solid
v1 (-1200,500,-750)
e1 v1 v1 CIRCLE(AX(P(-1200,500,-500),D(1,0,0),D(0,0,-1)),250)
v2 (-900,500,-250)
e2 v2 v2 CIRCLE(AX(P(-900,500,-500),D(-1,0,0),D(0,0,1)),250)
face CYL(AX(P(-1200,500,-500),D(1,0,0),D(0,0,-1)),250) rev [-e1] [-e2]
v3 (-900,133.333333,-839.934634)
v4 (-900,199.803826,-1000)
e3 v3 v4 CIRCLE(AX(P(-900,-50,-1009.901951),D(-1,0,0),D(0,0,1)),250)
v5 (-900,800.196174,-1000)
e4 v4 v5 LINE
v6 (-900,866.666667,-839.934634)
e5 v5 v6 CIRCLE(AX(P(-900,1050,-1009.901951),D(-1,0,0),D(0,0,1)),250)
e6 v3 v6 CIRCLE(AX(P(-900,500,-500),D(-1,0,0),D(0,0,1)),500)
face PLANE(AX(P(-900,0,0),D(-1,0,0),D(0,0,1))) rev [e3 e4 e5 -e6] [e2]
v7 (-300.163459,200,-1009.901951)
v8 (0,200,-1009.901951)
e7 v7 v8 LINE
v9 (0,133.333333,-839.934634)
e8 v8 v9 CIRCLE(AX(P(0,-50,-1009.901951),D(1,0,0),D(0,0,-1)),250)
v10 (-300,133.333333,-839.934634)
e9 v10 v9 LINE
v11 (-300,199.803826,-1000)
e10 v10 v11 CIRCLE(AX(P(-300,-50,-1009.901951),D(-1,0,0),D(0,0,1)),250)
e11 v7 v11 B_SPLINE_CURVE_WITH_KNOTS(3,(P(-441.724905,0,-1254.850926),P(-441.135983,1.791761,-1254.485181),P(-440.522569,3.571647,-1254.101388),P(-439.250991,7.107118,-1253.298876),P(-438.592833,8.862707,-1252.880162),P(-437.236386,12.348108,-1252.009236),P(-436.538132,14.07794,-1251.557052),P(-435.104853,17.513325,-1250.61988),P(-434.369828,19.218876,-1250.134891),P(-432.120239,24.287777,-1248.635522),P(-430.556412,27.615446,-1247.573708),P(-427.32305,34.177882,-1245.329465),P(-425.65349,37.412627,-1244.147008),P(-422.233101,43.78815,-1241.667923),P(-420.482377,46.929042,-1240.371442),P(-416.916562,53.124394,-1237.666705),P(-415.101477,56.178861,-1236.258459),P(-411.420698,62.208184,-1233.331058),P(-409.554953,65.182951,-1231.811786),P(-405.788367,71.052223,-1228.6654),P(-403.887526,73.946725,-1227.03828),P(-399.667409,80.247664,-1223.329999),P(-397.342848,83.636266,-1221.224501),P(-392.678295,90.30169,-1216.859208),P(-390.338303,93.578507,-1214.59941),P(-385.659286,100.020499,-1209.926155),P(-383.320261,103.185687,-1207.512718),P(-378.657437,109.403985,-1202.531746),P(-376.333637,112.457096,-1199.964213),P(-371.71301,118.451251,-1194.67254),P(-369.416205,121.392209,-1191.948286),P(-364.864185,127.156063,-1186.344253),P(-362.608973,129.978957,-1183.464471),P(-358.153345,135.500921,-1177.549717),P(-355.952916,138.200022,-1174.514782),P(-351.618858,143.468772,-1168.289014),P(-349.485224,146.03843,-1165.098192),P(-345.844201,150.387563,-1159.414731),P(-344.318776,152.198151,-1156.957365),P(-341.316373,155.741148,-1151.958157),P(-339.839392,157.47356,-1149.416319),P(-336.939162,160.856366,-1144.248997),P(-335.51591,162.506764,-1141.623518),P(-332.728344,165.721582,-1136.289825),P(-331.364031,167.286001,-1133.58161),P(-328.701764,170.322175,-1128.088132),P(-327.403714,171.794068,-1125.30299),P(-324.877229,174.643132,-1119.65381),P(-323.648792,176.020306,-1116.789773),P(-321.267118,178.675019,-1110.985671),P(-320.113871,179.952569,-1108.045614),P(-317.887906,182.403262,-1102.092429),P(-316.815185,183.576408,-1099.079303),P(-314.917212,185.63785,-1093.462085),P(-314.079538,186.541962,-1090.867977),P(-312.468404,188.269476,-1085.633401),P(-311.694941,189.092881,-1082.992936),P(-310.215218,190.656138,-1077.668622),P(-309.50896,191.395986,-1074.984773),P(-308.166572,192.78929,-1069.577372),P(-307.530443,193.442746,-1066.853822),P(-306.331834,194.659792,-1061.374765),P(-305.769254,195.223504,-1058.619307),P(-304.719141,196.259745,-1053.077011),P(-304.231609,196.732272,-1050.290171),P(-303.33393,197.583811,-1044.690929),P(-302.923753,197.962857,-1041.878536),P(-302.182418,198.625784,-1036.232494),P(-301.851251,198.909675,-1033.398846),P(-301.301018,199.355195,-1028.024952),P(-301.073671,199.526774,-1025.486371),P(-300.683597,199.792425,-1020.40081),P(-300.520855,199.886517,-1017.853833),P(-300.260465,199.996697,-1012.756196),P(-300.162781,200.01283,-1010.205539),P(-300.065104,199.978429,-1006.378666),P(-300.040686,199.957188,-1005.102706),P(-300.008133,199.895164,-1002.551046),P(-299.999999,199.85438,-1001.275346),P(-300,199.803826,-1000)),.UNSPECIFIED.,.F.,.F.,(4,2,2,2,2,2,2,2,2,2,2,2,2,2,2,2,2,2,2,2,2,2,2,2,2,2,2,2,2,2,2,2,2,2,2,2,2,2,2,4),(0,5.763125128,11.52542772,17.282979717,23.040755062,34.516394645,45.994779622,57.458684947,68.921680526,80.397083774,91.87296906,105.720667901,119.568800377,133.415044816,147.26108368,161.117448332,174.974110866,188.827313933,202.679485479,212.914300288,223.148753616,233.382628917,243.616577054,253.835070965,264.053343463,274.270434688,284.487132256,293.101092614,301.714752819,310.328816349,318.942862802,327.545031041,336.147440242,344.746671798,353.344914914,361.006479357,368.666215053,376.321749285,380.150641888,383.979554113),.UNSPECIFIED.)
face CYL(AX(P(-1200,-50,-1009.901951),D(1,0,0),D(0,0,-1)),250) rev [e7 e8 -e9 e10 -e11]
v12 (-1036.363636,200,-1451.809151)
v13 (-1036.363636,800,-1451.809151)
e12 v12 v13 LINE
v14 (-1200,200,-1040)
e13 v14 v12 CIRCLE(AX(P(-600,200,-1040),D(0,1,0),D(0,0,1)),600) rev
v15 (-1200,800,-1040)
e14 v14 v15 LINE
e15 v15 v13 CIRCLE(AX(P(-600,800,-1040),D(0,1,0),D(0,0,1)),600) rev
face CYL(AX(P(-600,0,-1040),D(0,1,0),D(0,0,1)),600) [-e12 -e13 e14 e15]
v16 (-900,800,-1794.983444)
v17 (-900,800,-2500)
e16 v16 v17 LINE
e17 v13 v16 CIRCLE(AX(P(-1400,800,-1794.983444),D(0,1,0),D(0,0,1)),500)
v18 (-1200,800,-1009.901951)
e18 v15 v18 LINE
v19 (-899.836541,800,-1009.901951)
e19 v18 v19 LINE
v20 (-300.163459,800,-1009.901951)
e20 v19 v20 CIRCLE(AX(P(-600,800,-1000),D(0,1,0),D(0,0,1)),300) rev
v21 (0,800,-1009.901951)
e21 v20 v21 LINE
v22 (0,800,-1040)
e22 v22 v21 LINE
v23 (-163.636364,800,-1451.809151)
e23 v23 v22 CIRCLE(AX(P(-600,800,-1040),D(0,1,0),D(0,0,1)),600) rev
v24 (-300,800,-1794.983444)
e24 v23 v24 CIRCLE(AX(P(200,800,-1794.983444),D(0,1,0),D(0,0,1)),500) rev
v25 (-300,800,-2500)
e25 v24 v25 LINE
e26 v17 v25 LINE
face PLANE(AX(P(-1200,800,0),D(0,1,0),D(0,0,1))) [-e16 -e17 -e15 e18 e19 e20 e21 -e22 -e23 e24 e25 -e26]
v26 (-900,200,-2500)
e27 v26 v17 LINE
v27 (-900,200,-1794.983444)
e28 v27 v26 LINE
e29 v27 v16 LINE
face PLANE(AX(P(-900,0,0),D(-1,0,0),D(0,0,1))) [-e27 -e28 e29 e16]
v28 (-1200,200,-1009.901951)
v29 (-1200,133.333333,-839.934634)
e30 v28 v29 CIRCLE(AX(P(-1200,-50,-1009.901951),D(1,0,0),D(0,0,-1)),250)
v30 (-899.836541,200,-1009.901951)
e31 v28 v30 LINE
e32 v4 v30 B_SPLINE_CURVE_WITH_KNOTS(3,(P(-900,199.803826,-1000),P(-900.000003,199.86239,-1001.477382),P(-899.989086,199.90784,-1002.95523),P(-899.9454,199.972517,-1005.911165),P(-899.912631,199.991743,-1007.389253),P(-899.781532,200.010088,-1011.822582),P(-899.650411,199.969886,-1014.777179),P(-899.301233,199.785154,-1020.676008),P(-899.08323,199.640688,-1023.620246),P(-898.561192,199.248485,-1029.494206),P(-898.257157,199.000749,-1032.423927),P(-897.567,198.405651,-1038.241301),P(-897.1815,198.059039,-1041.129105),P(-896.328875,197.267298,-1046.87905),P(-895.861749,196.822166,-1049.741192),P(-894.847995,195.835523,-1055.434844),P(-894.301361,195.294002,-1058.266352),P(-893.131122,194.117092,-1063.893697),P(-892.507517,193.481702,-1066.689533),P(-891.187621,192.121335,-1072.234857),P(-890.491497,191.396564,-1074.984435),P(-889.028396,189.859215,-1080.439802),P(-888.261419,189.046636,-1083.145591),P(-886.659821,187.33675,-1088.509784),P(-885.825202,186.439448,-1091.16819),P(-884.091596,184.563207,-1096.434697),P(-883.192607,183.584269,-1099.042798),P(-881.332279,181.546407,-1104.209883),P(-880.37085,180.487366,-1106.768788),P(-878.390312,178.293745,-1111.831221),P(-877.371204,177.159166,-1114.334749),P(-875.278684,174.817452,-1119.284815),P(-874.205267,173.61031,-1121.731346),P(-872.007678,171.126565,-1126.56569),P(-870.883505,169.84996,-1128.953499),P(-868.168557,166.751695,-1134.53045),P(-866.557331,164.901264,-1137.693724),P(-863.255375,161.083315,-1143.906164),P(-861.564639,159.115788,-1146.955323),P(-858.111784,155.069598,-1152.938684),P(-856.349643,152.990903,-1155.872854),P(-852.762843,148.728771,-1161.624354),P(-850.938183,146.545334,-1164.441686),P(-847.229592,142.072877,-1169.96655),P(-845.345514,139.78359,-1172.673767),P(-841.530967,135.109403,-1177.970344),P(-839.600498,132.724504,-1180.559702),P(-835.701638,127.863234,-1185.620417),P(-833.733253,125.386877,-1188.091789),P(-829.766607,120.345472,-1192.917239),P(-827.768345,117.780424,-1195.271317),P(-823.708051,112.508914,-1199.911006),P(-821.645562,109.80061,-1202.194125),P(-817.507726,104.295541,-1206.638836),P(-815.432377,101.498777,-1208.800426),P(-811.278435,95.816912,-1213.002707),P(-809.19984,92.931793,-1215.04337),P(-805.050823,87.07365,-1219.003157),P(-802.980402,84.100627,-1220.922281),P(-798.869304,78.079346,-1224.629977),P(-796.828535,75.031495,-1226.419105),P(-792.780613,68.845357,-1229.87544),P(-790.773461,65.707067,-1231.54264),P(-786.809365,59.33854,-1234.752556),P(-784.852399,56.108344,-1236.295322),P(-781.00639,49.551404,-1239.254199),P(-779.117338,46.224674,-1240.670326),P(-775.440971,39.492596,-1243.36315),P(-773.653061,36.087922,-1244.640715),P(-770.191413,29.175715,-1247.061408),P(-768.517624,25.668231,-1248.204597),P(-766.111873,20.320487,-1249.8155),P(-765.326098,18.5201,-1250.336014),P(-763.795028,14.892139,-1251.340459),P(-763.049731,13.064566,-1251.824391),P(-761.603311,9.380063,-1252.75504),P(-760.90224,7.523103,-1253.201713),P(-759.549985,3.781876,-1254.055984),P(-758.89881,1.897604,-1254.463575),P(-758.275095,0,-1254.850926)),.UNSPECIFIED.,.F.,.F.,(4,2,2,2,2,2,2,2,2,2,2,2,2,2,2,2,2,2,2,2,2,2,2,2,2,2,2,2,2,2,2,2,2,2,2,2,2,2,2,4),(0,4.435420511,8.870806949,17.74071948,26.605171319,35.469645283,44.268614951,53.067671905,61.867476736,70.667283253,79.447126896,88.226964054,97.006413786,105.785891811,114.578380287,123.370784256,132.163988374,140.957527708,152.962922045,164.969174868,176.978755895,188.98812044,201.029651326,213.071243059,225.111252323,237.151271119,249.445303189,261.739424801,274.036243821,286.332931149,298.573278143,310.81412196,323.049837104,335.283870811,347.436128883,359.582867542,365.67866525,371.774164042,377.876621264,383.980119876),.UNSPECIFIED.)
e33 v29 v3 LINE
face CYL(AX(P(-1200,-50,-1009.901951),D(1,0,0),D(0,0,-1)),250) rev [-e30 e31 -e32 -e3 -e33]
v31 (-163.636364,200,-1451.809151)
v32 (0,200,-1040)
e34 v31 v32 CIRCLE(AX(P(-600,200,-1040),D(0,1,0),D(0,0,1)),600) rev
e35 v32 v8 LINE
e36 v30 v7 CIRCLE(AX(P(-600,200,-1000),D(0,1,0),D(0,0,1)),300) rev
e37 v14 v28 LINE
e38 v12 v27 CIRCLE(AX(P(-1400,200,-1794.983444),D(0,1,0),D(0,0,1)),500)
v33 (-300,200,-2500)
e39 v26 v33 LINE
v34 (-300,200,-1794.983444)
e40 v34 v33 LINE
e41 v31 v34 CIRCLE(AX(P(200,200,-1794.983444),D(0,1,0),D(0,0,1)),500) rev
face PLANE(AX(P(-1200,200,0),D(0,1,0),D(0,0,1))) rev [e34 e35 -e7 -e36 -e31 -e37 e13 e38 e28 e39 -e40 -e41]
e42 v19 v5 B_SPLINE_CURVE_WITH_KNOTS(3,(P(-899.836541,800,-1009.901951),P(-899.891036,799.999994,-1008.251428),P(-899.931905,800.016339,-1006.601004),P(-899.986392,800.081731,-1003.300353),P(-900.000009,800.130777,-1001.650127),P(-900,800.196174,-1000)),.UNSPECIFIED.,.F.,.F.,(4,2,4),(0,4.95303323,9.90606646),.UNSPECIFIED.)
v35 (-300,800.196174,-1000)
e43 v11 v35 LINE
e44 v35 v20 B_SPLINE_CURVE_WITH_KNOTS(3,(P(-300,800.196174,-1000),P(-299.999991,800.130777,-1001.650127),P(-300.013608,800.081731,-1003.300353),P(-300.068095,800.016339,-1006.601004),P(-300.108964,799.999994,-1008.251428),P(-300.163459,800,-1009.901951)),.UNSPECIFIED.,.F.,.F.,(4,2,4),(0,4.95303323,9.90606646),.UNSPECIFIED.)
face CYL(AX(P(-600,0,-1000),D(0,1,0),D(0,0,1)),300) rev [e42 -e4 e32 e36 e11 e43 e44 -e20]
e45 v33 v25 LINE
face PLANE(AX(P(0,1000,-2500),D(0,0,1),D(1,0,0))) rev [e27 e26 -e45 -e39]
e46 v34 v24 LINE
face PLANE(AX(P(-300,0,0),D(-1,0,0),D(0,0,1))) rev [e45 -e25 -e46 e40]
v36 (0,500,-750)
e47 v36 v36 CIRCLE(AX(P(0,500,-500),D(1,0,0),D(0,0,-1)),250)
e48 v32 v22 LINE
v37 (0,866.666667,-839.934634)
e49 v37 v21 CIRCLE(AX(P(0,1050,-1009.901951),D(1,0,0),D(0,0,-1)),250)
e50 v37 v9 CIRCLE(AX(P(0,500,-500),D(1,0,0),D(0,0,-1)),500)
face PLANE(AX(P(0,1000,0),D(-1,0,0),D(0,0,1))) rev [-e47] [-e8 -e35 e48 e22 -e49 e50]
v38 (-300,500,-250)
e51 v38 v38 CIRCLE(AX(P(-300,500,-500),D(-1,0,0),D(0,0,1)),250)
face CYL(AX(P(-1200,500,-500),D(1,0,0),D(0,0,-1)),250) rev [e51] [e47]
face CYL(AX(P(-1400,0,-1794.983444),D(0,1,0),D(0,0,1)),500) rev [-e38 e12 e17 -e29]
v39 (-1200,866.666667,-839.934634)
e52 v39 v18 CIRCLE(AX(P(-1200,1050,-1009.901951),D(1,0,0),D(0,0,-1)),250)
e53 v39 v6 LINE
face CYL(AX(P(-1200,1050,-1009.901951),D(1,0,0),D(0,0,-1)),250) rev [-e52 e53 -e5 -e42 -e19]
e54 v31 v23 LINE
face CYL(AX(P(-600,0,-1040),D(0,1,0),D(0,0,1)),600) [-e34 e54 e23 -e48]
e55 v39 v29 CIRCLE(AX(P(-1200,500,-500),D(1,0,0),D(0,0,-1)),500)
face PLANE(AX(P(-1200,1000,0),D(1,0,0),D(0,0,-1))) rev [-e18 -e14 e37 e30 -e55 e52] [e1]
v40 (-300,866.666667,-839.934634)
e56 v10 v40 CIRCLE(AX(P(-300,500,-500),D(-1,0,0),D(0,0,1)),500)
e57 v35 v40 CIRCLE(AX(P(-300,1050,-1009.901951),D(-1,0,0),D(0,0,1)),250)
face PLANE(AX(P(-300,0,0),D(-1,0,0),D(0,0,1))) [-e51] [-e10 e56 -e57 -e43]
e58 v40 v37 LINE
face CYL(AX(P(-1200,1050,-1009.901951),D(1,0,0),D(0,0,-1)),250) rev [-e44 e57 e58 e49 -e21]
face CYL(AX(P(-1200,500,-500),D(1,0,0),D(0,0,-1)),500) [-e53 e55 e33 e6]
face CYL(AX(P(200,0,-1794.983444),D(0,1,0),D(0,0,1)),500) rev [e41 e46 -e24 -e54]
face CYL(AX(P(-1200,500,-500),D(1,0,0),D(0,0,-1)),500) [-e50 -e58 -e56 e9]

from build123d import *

# Parameters (mm, degrees)
SKETCH1_W           = 1200
SKETCH1_H           = 2500
BOSS_EXTRUDE1_DEPTH = 1000
CUT_EXTRUDE1_DEPTH  = 2948.880594597
SKETCH3_R           = 250
CUT_EXTRUDE2_DEPTH  = 2948.880594597


with BuildPart() as part:
    # Sketch1 → Boss-Extrude1 (new body)
    with BuildSketch(Plane(origin=(0, 0, 0), x_dir=(1, 0, 0), z_dir=(0, 1, 0))):
        with Locations((-600, 1250)):
            Rectangle(SKETCH1_W, SKETCH1_H)
    extrude(amount=BOSS_EXTRUDE1_DEPTH)

    # Sketch2 → Cut-Extrude1 (cut, through all)
    with BuildSketch(Plane(origin=(0, 1000, 0), x_dir=(1, 0, 0), z_dir=(0, 1, 0))):
        with BuildLine():
            ThreePointArc((-300, 1000), (-600, 1300), (-900, 1000))
            Line((-900, 1000), (-900, 0))
            Line((-900, 0), (-300, 0))
            Line((-300, 0), (-300, 1000))
        make_face()
        with BuildLine():
            Line((0, 2500), (-300, 2500))
            Line((-300, 2500), (-300, 1794.983443527))
            ThreePointArc((-300, 1794.983443527), (-264.660188642, 1610.346207058), (-163.636363636, 1451.809151015))
            ThreePointArc((-163.636363636, 1451.809151015), (-42.407773629, 1261.564683763), (0, 1040))
            Line((0, 1040), (0, 2500))
        make_face()
        with BuildLine():
            Line((-900, 1794.983443527), (-900, 2500))
            Line((-900, 2500), (-1200, 2500))
            Line((-1200, 2500), (-1200, 1040))
            ThreePointArc((-1200, 1040), (-1157.592226371, 1261.564683763), (-1036.363636364, 1451.809151015))
            ThreePointArc((-1036.363636364, 1451.809151015), (-935.339811358, 1610.346207058), (-900, 1794.983443527))
        make_face()
    extrude(amount=-CUT_EXTRUDE1_DEPTH, mode=Mode.SUBTRACT)

    # Sketch3 → Cut-Extrude2 (cut, through all)
    with BuildSketch(Plane(origin=(0, 0, 0), x_dir=(0, 0, -1), z_dir=(1, 0, 0))):
        with BuildLine():
            Line((2500, 800), (2500, 1000))
            Line((2500, 1000), (499.999999194, 1000))
            ThreePointArc((499.999999194, 1000), (682.57418546, 965.474668273), (839.93463424, 866.666666667))
            ThreePointArc((839.93463424, 866.666666667), (918.614858442, 817.262665937), (1009.901951359, 800))
            Line((1009.901951359, 800), (2500, 800))
        make_face()
        with BuildLine():
            Line((2500, 0), (2500, 200))
            Line((2500, 200), (1009.901951359, 200))
            ThreePointArc((1009.901951359, 200), (918.614858442, 182.737334063), (839.93463424, 133.333333333))
            ThreePointArc((839.93463424, 133.333333333), (682.574185835, 34.525331874), (500, 0))
            Line((500, 0), (2500, 0))
        make_face()
        with BuildLine():
            ThreePointArc((0, 500.000000799), (146.446609404, 853.553390591), (499.999999194, 1000))
            Line((499.999999194, 1000), (0, 1000))
            Line((0, 1000), (0, 500.000000799))
        make_face()
        with BuildLine():
            Line((0, 0), (500, 0))
            ThreePointArc((500, 0), (146.446609124, 146.446609689), (0, 500.000000799))
            Line((0, 500.000000799), (0, 0))
        make_face()
        with Locations((500, 500)):
            Circle(SKETCH3_R)
    extrude(amount=-CUT_EXTRUDE2_DEPTH, mode=Mode.SUBTRACT)


solid = part.part
